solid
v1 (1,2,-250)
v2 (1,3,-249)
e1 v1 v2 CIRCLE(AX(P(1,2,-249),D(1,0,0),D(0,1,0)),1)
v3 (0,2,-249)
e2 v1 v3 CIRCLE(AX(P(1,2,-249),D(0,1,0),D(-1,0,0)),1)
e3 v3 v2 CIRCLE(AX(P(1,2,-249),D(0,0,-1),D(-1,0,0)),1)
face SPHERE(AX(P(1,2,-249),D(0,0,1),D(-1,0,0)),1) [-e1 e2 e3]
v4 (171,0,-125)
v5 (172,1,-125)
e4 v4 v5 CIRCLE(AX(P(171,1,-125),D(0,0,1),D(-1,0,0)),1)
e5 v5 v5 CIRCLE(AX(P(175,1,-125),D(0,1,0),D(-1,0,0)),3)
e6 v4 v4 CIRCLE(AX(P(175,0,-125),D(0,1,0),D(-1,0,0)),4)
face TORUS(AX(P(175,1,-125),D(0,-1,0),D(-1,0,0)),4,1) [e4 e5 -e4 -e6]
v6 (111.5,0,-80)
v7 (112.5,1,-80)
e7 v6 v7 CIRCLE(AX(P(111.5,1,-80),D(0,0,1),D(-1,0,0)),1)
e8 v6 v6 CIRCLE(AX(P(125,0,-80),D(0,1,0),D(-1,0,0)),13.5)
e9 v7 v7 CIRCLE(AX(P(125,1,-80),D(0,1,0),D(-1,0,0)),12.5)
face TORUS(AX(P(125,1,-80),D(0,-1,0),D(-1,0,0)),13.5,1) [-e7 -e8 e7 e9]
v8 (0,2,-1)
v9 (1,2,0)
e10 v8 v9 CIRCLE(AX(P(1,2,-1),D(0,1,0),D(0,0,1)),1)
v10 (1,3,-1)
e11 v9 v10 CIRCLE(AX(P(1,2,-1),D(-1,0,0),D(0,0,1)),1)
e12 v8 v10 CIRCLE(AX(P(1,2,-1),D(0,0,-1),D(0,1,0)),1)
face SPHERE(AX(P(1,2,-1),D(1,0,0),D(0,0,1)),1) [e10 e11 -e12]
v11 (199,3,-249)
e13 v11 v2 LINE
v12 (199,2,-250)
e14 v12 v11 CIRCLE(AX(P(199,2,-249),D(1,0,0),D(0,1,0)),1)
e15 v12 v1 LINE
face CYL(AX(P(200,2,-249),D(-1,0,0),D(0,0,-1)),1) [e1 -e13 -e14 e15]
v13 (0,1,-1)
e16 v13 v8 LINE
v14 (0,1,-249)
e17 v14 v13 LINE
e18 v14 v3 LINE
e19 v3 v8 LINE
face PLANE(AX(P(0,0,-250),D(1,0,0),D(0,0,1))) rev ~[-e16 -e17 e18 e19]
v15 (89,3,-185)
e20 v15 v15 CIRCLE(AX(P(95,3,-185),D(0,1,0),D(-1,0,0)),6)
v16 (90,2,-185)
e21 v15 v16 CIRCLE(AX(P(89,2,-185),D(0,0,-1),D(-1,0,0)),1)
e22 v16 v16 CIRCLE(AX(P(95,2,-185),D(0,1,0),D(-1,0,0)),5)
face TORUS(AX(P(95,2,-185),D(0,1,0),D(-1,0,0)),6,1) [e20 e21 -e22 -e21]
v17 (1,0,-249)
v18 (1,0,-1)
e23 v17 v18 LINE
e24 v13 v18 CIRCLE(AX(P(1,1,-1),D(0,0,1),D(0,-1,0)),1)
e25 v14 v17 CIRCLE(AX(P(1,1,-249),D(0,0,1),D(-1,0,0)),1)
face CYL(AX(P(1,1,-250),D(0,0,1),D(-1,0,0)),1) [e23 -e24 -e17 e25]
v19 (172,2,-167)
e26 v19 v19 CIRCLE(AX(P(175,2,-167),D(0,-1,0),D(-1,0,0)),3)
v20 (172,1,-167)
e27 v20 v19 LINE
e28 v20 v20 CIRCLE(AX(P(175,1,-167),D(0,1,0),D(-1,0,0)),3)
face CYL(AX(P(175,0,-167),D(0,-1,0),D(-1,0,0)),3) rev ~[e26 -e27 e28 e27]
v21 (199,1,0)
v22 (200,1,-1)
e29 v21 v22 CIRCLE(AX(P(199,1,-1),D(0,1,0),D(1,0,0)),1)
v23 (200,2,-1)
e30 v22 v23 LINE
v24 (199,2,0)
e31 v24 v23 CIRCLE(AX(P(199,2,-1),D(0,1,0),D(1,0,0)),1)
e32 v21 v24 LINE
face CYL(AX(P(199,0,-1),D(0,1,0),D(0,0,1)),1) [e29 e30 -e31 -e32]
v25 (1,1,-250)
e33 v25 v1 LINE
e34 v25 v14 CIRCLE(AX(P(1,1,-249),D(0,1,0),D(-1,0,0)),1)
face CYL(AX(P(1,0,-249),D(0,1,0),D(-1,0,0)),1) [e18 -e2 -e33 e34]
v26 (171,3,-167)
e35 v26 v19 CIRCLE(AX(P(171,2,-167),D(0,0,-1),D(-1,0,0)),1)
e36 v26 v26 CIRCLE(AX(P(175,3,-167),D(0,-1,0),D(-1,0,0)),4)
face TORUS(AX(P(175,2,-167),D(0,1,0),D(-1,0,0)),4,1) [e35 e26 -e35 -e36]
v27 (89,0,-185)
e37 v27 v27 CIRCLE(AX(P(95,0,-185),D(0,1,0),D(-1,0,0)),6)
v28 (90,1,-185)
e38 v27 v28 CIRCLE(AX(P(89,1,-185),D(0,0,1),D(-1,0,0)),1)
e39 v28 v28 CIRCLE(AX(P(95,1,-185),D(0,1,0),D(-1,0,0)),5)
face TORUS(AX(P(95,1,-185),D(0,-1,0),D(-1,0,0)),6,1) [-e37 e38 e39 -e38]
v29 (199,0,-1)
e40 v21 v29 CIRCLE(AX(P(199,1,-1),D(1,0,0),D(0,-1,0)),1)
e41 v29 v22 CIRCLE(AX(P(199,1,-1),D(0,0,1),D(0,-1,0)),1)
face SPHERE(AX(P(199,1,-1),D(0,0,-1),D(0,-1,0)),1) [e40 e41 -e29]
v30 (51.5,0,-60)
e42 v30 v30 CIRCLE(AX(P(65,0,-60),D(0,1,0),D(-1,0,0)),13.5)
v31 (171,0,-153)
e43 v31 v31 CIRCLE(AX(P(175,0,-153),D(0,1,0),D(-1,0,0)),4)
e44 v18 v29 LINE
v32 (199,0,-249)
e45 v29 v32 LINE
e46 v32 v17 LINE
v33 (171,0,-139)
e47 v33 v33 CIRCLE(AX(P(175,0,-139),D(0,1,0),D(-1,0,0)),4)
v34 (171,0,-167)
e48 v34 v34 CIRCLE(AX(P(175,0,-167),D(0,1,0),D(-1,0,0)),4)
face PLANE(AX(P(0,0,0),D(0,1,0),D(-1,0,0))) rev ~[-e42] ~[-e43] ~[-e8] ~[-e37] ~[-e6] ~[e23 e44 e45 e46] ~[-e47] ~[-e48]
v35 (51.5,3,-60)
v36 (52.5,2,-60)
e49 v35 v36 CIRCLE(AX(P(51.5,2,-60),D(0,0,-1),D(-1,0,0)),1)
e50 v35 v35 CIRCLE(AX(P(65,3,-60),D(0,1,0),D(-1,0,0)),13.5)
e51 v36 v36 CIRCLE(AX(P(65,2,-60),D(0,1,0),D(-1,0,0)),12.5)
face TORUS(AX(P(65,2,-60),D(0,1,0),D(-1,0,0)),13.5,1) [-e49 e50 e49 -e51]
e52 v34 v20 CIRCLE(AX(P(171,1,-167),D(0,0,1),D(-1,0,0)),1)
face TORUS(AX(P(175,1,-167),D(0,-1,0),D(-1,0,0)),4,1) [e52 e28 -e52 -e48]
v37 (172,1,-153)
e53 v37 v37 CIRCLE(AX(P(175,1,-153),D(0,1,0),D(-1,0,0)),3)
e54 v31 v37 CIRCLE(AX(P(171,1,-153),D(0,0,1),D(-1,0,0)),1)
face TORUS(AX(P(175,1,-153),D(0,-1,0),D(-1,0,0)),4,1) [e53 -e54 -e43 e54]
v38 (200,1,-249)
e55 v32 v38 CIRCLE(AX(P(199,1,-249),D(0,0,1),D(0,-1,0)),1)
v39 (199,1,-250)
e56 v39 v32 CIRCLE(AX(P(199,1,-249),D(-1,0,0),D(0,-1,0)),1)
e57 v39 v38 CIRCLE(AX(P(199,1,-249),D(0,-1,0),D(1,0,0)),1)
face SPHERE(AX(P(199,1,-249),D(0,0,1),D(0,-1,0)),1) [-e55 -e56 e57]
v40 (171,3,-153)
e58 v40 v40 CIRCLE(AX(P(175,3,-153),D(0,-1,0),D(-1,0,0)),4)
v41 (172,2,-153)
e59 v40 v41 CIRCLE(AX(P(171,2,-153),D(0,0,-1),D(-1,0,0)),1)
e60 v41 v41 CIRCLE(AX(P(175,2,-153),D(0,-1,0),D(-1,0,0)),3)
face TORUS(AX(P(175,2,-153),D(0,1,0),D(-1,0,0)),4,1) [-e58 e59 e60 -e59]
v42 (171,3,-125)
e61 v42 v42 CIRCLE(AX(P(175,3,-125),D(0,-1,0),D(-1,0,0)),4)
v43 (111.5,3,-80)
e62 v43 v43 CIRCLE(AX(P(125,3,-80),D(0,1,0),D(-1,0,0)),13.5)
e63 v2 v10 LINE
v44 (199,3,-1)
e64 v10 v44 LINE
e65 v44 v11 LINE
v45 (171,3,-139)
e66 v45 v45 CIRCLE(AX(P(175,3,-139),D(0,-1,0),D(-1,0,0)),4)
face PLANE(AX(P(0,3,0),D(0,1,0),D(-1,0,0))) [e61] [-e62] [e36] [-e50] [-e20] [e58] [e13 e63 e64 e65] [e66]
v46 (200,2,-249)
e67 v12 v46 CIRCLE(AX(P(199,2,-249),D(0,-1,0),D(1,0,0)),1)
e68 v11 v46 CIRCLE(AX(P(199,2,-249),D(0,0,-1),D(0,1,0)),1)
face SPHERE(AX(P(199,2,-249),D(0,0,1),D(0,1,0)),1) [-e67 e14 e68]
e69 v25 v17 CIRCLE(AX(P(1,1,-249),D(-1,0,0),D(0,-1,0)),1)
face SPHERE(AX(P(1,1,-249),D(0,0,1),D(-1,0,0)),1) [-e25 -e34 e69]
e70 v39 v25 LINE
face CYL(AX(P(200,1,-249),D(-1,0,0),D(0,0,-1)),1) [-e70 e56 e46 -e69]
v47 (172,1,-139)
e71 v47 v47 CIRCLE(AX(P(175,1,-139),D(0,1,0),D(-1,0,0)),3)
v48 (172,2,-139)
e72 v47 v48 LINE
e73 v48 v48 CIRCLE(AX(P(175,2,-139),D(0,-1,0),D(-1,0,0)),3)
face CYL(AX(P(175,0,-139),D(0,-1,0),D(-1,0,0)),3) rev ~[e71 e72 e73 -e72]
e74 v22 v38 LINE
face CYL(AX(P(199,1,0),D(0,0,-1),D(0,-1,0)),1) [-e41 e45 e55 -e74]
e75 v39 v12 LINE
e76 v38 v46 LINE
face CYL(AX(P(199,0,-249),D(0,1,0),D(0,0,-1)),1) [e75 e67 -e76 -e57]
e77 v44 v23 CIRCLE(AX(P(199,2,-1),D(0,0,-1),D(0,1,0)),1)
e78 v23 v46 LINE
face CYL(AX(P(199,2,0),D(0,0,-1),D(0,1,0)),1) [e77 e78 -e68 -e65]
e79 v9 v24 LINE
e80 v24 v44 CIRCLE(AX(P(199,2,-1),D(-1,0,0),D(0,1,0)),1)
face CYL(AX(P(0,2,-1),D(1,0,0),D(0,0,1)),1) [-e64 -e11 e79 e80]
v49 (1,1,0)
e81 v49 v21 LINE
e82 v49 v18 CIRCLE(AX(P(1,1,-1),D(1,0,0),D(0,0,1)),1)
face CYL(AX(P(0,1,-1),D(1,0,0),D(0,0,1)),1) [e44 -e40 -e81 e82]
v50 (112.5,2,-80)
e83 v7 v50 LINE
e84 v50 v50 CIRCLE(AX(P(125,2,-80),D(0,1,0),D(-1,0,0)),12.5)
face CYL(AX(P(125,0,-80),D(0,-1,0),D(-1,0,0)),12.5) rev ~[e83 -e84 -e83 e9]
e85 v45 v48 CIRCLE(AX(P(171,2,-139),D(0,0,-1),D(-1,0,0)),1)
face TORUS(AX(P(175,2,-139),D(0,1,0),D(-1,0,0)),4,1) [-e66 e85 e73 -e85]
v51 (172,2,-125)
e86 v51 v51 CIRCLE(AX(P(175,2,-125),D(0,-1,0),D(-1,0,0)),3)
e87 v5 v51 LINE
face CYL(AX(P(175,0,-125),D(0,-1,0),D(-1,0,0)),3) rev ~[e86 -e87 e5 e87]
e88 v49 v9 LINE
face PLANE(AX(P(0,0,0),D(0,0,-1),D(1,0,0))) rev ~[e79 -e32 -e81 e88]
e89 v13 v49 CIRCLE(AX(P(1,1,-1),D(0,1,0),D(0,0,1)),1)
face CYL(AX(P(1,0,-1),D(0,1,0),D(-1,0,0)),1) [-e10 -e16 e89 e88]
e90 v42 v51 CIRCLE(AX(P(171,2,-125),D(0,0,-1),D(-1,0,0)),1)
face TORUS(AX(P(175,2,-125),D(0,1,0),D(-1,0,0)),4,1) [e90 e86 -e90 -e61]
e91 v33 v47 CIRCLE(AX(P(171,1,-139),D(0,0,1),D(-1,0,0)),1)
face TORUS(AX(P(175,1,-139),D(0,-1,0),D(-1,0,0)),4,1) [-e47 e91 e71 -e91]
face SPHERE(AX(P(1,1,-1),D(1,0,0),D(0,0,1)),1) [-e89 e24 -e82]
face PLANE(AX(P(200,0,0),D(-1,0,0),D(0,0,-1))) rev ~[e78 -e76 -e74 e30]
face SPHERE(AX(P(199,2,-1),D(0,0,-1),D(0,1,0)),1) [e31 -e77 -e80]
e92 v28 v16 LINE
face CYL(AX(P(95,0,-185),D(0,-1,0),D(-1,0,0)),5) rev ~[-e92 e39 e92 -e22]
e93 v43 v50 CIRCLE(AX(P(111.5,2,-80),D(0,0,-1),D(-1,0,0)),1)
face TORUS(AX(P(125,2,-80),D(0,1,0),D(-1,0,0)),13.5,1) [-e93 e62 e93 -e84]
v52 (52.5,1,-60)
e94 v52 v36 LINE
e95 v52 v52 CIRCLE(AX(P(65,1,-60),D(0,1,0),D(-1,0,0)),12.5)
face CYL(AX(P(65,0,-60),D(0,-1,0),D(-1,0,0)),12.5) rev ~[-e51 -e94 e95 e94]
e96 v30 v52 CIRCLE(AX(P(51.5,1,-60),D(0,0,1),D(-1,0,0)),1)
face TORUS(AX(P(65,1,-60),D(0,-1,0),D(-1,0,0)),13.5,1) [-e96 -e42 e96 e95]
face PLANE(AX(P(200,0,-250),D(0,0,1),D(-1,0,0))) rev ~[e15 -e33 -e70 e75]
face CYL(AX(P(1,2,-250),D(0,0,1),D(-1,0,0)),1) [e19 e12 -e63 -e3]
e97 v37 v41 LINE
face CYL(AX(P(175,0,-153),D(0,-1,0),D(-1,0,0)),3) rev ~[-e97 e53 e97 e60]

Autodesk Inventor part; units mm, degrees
ref_plane "YZ Plane" through (0, 0, 0) normal (1, 0, 0) x (0, 1, 0)
ref_plane "XZ Plane" through (0, 0, 0) normal (0, 1, 0) x (-1, 0, 0)
ref_plane "XY Plane" through (0, 0, 0) normal (0, 0, 1) x (1, 0, 0)
sketch "page_lines" plane through (0, 0, 0) normal (0, 1, 0) x (-1, 0, 0)
  line L0 (0, 0) -> (-200, 0)
  line L1 (-200, 0) -> (-200, -250)
  line L2 (-200, -250) -> (0, -250)
  line L3 (0, -250) -> (0, 0)
  circle A0 centre (-65, -60) radius 6
  circle A1 centre (-125, -80) radius 6
  circle A2 centre (-65, -60) radius 12.5
  circle A3 centre (-65, -60) radius 8.5
  circle A4 centre (-125, -80) radius 8.5
  circle A5 centre (-125, -80) radius 12.5
  circle A6 centre (-175, -125) radius 3
  line L4 (-175, -125) -> (-175, -209)
  line L5 (-175, -125) -> (-91, -125) construction
  circle A7 centre (-175, -139) radius 3
  circle A8 centre (-175, -153) radius 3
  circle A9 centre (-175, -167) radius 3
  circle A10 centre (-175, -181) radius 3
  circle A11 centre (-175, -195) radius 3
  circle A12 centre (-175, -209) radius 3
  circle A13 centre (-95, -185) radius 2.5
  circle A14 centre (-95, -185) radius 5
  point P0 (-200, -125)
  dimension "d0" = 200
  dimension "d1" = 250
  dimension "d2" = 12
  dimension "d3" = 12
  dimension "d4" = 25
  dimension "d5" = 17
  dimension "d6" = 17
  dimension "d7" = 25
  dimension "d8" = 75
  dimension "d9" = 80
  dimension "d10" = 65
  dimension "d11" = 60
  dimension "d12" = 6
  dimension "d13" = 84
  dimension "d14" = 90
  dimension "d15" = 25
  dimension "d16" = 125
  dimension "d19" = 14
  dimension "d24" = 5
  dimension "d25" = 10
  dimension "d26" = 65
  dimension "d27" = 95
extrude "nand" add sketch "page_lines" along normal blind 3 contours L3 L2 L1 L0 | A10 L4 | L4 A10 | A11 L4 | L4 A11 | A12
fillet "Fillet1" radius 1 26 edges at (77.5, 3, -60) (77.5, 0, -60) (100, 3, -185) (100, 0, -185) (178, 3, -125) (178, 0, -125) (200, 3, -125) (200, 0, -125) (100, 0, 0) (100, 3, 0) (200, 1.5, 0) (0, 1.5, 0) (0, 3, -125) (0, 0, -125) (0, 1.5, -250) (100, 3, -250) (100, 0, -250) (200, 1.5, -250) (178, 3, -139) (178, 0, -139) (137.5, 3, -80) (137.5, 0, -80) (178, 3, -153) (178, 0, -153) (178, 3, -167) (178, 0, -167)
properties part number "pages_nand"
